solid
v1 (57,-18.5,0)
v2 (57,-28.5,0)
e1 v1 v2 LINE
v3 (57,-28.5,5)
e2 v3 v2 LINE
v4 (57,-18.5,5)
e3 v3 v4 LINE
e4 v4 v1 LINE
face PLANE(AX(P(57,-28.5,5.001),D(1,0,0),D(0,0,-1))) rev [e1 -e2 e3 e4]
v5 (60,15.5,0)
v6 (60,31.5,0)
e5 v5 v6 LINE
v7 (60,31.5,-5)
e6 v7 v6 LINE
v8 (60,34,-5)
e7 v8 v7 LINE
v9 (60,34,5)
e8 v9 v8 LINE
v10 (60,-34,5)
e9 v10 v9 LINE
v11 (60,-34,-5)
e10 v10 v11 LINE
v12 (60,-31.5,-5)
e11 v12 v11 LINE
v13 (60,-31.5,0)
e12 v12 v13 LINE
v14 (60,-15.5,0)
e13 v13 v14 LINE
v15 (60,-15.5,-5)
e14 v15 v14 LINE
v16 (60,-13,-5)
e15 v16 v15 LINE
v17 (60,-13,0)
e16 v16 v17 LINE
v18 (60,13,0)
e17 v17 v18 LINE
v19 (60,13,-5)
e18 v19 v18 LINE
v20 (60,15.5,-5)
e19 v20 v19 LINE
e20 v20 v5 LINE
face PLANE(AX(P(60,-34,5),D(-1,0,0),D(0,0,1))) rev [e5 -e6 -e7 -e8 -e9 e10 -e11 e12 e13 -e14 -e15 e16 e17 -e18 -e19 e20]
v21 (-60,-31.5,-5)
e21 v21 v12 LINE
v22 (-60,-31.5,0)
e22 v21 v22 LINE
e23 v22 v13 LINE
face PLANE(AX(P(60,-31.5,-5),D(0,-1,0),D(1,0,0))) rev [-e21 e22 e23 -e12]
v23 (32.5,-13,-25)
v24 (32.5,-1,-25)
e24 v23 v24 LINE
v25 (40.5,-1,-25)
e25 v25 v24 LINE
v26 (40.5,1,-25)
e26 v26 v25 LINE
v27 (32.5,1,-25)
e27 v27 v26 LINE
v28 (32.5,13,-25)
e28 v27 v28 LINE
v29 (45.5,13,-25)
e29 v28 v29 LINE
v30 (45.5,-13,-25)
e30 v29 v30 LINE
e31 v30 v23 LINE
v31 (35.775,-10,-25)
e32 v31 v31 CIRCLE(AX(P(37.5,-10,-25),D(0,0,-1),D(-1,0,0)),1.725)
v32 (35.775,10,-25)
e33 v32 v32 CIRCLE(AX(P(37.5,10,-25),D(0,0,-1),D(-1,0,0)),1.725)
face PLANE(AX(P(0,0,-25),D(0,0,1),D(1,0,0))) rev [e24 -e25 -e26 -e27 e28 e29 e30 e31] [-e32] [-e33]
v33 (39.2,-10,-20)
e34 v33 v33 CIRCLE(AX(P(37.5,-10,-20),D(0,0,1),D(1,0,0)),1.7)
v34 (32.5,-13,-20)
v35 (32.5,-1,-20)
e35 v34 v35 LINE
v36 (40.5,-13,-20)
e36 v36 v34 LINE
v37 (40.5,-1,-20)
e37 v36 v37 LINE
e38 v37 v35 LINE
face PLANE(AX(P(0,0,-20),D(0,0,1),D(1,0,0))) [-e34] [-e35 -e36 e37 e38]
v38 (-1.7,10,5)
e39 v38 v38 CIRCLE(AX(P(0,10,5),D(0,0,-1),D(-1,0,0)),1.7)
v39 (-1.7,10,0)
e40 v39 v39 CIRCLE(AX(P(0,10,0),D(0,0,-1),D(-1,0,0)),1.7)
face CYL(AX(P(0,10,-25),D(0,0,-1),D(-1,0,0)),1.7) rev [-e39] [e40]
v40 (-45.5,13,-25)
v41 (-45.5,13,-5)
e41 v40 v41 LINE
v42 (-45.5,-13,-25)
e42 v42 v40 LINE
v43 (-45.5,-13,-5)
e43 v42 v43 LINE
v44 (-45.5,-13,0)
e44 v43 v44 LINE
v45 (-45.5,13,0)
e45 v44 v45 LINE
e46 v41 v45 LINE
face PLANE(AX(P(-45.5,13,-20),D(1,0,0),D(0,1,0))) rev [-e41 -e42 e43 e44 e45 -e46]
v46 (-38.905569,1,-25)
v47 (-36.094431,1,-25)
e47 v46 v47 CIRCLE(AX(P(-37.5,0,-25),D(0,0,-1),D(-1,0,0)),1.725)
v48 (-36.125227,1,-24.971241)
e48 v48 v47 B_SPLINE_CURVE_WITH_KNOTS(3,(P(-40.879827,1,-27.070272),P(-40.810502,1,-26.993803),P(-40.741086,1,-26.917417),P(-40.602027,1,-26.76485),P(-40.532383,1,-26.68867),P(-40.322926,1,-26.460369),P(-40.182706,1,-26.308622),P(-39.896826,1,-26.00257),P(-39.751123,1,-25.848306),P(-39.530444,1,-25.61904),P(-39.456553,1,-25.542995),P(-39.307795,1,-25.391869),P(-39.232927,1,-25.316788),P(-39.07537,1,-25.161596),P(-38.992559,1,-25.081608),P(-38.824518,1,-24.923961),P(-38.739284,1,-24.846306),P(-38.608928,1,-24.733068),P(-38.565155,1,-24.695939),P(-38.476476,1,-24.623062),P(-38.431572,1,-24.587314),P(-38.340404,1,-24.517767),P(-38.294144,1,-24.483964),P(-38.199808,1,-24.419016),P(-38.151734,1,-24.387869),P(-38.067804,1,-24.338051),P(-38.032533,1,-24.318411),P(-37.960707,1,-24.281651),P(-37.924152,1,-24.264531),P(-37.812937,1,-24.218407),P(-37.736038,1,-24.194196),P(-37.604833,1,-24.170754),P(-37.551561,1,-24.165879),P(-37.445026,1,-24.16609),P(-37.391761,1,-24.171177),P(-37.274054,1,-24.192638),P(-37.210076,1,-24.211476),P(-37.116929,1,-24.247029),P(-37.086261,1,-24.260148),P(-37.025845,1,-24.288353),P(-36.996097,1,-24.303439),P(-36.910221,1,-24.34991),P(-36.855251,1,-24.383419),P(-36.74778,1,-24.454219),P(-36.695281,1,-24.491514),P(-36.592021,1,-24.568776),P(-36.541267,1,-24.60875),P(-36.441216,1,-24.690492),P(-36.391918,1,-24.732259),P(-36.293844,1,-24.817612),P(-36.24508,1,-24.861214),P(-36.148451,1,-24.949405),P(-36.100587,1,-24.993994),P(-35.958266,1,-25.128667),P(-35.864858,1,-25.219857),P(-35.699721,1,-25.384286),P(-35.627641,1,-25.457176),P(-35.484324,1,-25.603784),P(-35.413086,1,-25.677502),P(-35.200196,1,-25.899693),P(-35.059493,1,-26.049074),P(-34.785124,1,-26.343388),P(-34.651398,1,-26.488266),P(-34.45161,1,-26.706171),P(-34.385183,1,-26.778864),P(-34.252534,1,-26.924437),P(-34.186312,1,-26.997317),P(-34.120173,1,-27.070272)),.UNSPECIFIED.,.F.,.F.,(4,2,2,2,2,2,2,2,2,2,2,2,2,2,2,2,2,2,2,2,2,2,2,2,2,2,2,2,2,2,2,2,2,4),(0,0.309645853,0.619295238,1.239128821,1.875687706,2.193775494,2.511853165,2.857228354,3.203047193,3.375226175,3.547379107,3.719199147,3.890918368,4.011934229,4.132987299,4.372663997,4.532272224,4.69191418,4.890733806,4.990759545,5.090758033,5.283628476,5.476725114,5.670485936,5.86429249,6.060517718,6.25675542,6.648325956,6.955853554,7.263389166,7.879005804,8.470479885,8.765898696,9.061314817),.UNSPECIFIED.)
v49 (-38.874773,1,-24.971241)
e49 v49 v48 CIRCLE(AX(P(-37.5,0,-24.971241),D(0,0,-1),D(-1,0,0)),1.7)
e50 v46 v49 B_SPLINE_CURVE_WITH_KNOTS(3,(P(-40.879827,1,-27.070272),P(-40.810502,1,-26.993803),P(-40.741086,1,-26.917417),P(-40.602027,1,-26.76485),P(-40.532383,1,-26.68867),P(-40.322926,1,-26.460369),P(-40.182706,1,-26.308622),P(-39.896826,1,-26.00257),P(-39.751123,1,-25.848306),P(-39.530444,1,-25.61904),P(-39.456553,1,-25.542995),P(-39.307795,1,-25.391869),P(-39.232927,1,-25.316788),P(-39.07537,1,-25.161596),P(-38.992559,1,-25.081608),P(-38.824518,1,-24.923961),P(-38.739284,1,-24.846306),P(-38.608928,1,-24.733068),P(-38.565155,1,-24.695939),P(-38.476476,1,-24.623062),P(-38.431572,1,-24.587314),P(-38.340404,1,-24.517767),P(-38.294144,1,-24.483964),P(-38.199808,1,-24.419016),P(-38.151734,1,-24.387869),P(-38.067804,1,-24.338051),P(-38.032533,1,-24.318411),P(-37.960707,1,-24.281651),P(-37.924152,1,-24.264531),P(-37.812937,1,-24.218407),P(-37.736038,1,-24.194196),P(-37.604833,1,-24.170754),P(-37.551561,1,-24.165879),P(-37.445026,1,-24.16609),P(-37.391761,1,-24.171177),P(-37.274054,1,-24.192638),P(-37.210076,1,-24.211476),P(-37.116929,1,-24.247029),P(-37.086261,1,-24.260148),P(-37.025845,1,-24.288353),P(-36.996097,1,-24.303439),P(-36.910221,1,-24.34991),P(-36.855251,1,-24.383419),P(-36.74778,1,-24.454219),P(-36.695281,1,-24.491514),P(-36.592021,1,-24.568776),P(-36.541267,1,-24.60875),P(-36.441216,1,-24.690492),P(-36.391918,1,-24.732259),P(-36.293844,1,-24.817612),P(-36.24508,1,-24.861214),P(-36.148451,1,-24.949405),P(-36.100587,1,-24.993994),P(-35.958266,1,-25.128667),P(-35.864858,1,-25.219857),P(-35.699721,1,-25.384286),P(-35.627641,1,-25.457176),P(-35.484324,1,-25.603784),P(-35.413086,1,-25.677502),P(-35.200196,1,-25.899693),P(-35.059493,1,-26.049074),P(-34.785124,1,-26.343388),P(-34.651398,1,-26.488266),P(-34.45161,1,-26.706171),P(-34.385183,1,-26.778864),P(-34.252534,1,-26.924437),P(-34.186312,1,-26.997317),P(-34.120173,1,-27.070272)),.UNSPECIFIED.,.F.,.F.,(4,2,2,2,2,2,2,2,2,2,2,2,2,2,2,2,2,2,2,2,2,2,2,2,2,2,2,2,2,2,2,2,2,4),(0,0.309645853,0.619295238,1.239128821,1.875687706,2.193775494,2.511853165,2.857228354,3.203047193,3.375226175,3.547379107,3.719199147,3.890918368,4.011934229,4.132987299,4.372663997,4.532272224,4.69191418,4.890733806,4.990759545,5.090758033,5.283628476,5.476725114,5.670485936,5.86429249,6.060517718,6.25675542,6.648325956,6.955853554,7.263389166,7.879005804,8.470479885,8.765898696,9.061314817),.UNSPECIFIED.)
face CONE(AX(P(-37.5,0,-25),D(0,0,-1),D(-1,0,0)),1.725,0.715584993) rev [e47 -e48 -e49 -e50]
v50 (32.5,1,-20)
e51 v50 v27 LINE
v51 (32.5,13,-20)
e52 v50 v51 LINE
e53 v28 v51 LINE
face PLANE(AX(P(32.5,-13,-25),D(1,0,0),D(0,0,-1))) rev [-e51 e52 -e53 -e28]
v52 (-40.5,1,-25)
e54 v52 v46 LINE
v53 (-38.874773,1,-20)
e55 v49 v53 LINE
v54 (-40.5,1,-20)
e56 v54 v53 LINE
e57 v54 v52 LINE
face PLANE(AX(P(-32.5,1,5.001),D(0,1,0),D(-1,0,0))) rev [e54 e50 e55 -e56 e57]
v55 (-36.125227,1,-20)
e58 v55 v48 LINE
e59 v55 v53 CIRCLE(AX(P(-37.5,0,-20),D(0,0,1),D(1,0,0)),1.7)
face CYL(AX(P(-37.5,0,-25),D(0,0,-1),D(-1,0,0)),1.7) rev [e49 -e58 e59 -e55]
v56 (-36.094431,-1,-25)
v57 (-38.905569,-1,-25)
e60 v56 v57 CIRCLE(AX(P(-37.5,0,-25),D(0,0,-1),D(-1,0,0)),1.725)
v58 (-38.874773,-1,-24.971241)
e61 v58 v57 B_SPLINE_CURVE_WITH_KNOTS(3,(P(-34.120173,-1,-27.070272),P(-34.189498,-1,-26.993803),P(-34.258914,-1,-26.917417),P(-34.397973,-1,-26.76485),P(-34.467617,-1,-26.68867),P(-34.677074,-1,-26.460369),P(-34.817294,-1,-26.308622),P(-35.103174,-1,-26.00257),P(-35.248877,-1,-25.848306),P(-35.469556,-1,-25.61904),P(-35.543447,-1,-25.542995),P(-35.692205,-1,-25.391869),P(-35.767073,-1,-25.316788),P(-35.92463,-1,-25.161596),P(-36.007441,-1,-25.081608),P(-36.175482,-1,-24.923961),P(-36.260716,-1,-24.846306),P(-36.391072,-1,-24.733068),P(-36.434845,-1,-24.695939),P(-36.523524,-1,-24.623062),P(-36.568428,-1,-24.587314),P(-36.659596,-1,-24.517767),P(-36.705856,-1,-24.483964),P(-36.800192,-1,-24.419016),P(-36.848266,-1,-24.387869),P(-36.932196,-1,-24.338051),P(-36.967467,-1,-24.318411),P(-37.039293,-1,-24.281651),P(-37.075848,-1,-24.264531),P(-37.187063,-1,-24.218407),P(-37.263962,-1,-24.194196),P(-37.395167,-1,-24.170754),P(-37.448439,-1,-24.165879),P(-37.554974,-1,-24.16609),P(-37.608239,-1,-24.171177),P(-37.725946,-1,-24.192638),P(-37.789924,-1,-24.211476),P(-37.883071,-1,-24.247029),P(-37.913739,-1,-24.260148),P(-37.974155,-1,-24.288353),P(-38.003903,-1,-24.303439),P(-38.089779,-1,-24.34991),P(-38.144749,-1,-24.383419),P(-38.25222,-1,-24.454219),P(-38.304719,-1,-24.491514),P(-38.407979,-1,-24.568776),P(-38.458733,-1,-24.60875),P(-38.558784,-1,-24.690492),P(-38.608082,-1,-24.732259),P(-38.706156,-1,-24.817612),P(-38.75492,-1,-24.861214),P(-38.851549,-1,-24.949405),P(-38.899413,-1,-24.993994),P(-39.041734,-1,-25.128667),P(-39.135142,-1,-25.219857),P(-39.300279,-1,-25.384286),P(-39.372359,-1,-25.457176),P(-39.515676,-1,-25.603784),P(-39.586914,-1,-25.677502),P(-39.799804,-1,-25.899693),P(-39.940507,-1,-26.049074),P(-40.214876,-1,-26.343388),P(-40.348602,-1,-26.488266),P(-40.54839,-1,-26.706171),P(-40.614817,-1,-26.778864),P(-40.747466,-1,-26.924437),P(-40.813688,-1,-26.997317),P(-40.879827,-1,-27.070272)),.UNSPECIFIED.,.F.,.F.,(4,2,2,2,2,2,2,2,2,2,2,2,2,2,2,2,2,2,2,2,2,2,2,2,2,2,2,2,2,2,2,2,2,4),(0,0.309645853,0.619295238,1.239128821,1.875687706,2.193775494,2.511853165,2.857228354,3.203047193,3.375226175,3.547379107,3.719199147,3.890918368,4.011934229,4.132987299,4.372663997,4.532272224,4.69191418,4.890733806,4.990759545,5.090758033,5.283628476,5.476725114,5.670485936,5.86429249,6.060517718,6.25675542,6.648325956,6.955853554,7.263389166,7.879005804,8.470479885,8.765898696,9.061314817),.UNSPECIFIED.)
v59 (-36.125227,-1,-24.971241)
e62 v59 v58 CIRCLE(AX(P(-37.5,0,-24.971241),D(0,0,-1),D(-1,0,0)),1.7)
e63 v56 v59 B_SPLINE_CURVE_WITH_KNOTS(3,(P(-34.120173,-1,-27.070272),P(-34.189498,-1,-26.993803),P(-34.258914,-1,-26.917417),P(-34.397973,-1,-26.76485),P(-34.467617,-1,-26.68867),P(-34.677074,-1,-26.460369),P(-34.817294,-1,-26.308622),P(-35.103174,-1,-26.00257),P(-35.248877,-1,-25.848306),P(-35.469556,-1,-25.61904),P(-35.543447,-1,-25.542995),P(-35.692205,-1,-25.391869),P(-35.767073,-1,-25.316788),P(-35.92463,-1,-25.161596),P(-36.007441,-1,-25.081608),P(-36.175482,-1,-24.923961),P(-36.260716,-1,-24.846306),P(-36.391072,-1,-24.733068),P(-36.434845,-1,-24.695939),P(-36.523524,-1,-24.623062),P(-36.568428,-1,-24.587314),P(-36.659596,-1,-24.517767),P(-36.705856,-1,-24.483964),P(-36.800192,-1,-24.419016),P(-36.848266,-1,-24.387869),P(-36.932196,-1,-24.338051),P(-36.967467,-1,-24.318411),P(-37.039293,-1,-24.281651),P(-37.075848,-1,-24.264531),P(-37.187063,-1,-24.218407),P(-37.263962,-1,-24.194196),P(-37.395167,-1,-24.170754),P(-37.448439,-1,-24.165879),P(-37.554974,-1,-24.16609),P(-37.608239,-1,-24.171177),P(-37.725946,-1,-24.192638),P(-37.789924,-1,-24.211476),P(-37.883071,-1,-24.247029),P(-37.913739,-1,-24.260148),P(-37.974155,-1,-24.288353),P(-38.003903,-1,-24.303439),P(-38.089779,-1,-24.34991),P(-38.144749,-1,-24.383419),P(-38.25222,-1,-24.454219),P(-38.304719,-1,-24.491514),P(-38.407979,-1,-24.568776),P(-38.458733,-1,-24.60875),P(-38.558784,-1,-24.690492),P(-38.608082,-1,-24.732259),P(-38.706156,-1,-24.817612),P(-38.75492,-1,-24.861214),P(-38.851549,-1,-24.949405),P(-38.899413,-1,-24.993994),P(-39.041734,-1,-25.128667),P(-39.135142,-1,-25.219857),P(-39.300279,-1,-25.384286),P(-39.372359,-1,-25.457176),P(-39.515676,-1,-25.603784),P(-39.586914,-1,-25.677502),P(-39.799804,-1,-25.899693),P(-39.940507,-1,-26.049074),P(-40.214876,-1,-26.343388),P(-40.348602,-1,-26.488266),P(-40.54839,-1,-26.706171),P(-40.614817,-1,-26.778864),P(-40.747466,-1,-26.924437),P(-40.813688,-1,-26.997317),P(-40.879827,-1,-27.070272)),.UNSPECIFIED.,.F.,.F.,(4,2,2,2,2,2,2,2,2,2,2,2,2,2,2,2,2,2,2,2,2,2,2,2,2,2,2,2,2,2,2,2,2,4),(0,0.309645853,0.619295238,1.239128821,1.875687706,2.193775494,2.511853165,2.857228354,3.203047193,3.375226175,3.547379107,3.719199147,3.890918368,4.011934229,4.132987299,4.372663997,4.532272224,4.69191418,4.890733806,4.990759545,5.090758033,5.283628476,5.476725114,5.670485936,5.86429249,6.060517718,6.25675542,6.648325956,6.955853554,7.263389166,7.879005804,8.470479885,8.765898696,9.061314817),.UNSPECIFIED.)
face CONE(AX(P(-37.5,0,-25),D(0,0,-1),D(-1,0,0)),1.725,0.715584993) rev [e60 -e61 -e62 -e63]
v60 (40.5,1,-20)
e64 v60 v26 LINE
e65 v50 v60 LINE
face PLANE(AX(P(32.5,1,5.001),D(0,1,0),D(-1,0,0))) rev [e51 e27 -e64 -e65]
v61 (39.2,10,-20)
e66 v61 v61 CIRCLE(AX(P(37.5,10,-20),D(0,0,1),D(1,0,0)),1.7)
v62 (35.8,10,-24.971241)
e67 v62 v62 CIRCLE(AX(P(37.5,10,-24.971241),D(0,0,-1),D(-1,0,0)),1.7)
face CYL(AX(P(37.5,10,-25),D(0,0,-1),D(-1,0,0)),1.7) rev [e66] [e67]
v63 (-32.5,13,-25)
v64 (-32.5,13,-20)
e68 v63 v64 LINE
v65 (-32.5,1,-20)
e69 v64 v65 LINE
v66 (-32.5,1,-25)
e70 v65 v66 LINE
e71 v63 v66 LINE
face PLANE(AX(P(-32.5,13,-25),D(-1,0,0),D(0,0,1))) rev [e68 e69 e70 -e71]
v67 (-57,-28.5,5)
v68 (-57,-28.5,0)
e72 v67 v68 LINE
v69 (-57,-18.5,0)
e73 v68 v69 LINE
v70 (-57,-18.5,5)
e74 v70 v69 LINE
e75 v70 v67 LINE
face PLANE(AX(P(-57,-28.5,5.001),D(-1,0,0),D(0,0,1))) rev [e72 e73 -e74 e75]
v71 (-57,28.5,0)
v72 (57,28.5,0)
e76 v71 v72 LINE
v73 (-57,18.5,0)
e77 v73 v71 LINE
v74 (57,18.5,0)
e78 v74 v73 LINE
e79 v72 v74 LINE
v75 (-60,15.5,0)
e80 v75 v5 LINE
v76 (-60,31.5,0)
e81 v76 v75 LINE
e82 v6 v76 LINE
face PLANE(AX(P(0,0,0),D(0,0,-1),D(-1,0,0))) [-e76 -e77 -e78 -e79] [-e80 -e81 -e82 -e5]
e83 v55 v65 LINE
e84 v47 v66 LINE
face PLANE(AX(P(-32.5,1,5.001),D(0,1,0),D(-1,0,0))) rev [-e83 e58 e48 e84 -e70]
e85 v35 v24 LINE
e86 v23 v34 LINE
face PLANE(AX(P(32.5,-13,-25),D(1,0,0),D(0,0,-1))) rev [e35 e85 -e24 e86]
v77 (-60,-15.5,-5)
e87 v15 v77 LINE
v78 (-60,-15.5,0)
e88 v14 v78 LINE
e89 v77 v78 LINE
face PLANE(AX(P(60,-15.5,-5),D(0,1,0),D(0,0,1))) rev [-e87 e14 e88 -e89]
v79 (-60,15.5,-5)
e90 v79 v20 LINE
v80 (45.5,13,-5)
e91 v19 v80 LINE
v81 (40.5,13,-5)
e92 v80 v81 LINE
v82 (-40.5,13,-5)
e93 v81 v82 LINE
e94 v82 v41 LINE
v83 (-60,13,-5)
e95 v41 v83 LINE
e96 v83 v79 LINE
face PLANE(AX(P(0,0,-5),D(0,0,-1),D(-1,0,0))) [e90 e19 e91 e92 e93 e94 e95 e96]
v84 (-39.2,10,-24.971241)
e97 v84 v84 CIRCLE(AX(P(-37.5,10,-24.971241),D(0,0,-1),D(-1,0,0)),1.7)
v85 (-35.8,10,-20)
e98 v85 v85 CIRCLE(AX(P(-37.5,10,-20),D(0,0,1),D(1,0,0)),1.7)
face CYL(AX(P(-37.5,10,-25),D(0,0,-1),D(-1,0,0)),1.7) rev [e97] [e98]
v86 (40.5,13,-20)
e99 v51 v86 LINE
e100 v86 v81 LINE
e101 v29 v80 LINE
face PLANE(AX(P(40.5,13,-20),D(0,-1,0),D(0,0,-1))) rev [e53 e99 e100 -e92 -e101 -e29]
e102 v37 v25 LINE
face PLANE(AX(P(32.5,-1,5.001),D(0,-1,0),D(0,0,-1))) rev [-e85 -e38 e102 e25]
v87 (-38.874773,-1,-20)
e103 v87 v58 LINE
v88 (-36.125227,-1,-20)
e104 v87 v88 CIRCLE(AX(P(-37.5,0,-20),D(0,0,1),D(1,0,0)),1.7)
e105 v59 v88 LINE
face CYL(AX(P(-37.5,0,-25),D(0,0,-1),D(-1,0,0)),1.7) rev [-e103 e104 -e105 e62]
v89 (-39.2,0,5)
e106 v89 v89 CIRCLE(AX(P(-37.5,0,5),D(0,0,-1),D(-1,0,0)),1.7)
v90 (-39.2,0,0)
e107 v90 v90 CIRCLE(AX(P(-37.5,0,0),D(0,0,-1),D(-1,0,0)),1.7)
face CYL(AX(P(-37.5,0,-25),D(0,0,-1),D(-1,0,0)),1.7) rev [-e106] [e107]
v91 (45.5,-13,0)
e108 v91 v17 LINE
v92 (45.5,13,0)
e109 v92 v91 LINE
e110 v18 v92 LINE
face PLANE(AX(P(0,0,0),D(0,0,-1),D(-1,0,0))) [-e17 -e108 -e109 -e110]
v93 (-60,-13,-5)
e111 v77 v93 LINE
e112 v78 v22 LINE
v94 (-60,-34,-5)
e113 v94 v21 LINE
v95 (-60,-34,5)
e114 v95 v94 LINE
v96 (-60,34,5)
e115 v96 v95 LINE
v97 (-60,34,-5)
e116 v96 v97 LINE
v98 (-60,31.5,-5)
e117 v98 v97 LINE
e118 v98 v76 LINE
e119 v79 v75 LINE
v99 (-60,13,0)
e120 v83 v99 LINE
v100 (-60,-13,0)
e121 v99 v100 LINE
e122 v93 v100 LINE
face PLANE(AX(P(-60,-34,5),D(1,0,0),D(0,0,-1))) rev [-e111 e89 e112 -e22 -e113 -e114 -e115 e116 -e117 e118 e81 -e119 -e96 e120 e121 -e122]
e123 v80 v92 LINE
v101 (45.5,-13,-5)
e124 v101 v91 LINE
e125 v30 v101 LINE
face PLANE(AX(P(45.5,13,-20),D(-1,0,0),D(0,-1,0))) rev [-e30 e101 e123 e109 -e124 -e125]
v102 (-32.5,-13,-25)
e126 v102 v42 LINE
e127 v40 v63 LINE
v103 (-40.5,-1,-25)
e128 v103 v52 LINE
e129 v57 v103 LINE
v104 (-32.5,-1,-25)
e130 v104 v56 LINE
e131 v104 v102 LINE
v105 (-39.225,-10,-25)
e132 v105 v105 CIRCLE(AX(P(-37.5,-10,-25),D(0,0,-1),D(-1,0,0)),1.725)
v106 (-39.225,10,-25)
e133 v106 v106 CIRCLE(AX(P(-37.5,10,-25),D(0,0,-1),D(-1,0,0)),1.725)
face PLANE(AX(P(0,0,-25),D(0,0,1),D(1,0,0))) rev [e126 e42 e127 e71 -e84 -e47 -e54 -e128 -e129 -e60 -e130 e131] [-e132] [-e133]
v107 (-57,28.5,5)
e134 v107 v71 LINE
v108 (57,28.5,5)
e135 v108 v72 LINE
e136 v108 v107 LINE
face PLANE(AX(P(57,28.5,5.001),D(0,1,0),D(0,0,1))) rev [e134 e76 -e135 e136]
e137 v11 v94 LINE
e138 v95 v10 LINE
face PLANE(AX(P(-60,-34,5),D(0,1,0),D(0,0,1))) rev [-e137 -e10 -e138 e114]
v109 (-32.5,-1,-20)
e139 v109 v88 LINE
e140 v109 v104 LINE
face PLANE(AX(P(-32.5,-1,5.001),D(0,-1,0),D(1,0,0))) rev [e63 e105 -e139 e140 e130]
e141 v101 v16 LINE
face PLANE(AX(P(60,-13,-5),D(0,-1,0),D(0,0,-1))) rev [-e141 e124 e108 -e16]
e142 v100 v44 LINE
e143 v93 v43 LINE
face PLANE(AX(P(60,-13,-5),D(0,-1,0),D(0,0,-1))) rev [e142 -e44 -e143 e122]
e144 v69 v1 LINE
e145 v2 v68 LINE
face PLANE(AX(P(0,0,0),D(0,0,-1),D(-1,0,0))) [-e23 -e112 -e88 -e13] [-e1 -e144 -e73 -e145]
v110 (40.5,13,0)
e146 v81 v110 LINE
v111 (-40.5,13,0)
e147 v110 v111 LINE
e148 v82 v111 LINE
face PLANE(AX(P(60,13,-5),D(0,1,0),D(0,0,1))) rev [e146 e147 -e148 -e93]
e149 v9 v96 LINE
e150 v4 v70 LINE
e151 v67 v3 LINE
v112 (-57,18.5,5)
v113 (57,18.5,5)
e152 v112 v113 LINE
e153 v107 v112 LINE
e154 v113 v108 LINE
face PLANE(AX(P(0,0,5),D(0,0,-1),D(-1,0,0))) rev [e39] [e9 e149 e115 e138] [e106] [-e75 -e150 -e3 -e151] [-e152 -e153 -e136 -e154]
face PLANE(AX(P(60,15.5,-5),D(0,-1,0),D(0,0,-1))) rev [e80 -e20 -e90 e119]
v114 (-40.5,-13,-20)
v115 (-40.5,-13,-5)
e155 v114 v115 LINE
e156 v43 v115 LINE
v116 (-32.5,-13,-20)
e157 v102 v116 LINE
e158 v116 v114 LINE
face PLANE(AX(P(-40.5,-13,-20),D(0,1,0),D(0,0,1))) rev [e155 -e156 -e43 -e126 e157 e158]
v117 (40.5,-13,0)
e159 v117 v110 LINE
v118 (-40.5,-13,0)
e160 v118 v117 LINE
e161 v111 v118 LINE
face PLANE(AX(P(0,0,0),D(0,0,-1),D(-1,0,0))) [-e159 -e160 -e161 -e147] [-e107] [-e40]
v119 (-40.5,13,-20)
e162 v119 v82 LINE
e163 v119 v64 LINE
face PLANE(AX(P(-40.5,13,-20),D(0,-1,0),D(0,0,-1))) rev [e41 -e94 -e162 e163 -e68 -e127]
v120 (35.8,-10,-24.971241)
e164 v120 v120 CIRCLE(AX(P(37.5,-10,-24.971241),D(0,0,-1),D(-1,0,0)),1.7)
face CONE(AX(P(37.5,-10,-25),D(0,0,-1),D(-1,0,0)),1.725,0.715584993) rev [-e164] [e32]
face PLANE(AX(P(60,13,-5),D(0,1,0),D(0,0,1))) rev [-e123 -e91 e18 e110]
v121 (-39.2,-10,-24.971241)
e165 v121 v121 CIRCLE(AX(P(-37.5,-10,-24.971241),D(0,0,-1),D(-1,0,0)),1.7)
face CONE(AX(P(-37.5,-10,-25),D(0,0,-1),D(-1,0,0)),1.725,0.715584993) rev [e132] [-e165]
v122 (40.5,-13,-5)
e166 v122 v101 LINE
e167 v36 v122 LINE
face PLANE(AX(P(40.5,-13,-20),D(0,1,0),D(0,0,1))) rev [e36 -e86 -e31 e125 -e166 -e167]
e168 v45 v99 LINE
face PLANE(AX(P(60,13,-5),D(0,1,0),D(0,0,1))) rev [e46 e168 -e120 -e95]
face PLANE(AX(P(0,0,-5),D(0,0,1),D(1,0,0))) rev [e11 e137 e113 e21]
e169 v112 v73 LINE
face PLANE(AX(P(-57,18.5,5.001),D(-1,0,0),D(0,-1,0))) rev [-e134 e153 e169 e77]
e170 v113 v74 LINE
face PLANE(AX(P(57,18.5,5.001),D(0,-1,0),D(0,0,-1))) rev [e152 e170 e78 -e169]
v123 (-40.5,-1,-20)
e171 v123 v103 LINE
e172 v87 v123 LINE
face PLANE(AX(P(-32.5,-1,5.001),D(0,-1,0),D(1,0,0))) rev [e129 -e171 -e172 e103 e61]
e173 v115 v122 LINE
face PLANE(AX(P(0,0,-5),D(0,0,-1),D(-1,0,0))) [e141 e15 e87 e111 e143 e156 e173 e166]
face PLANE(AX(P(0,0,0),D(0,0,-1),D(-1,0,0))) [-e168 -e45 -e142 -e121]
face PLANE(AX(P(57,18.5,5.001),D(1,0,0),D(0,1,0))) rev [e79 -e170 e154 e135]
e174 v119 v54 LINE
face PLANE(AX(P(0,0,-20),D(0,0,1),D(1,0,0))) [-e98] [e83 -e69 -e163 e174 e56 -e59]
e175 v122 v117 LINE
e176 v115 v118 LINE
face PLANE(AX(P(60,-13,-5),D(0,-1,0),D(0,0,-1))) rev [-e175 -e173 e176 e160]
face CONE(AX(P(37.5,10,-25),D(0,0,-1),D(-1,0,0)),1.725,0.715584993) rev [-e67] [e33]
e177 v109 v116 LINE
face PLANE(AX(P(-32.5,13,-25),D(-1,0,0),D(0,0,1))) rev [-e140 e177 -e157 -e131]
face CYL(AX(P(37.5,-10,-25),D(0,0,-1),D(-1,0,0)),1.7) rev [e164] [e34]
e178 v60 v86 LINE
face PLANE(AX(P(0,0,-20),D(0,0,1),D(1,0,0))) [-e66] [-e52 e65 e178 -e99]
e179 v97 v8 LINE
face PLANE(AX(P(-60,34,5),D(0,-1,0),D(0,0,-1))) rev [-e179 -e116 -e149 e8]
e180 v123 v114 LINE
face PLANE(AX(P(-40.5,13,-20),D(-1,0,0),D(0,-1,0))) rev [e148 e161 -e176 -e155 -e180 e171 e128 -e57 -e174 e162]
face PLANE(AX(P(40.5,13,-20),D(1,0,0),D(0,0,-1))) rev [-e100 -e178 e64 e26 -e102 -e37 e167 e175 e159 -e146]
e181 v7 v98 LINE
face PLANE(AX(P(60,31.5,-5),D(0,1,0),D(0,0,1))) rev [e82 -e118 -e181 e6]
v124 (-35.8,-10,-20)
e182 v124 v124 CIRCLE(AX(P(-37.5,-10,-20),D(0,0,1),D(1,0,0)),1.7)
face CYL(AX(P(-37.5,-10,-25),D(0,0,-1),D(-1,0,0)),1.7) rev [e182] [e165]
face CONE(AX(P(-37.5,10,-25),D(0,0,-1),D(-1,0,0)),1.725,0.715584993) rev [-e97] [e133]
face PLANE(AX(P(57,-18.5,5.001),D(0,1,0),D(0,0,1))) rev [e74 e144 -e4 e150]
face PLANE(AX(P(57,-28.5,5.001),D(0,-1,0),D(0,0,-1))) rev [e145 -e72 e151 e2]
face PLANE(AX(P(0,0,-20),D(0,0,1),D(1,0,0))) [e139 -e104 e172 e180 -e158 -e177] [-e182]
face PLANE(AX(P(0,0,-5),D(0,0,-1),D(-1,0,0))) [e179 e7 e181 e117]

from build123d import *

# Parameters (mm, degrees)
SKETCH_1_W                 = 120
SKETCH_1_H                 = 68
EXTRUDE_1_DEPTH            = 5
SKETCH_2_W                 = 120
SKETCH_2_H                 = 2.5
EXTRUDE_2_DEPTH            = 5
CUT_EXTRUDE_1_REACH        = 71.145
SKETCH_3_W                 = 114
SKETCH_3_H                 = 10
SKETCH_4_W                 = 5
SKETCH_4_H                 = 26
EXTRUDE_3_DEPTH            = 20
SKETCH_5_W                 = 13
SKETCH_5_H                 = 26
EXTRUDE_4_DEPTH            = 5
CUT_EXTRUDE_2_REACH        = 77.206
SKETCH_6_W                 = 8
SKETCH_6_H                 = 2
HOLE_WIZARD_M3_1_OUTLINE_R = 1.7
HOLE_WIZARD_M3_1_DEPTH     = 5


# Read off the part's stored shape, not the designer's step: M3 すきま穴1
with BuildPart() as part:
    # ｽｹｯﾁ1 → ﾎﾞｽ - 押し出し1 (new body)
    with BuildSketch(Plane.XY):
        Rectangle(SKETCH_1_W, SKETCH_1_H)
    extrude(amount=EXTRUDE_1_DEPTH)

    # ｽｹｯﾁ2 → ﾎﾞｽ - 押し出し2 (add)
    with BuildSketch(Plane(origin=(0, 0, 0), x_dir=(-1, 0, 0), z_dir=(0, 0, -1))):
        with Locations((0, 32.75)):
            Rectangle(SKETCH_2_W, SKETCH_2_H)
        with Locations((0, 14.25)):
            Rectangle(SKETCH_2_W, SKETCH_2_H)
        with Locations((0, -14.25)):
            Rectangle(SKETCH_2_W, SKETCH_2_H)
        with Locations((0, -32.75)):
            Rectangle(SKETCH_2_W, SKETCH_2_H)
    extrude(amount=EXTRUDE_2_DEPTH)

    # ｽｹｯﾁ3 → ｶｯﾄ - 押し出し1 (cut, up to next)
    with BuildSketch(Plane(origin=(0, 0, 0), x_dir=(-1, 0, 0), z_dir=(0, 0, -1)), mode=Mode.PRIVATE) as cut_extrude_1_sk1:
        with Locations((0, 23.5)):
            Rectangle(SKETCH_3_W, SKETCH_3_H)
    cut_extrude_1_tool1 = extrude(cut_extrude_1_sk1.sketch, amount=-CUT_EXTRUDE_1_REACH, mode=Mode.PRIVATE) & part.part
    # ｽｹｯﾁ3 → ｶｯﾄ - 押し出し1 (cut, up to next)
    with BuildSketch(Plane(origin=(0, 0, 0), x_dir=(-1, 0, 0), z_dir=(0, 0, -1)), mode=Mode.PRIVATE) as cut_extrude_1_sk2:
        with Locations((0, -23.5)):
            Rectangle(SKETCH_3_W, SKETCH_3_H)
    cut_extrude_1_tool2 = extrude(cut_extrude_1_sk2.sketch, amount=-CUT_EXTRUDE_1_REACH, mode=Mode.PRIVATE) & part.part
    add(cut_extrude_1_tool1.solids().sort_by_distance((0, 23.5, 0))[0], mode=Mode.SUBTRACT)
    add(cut_extrude_1_tool2.solids().sort_by_distance((0, -23.5, 0))[0], mode=Mode.SUBTRACT)

    # ｽｹｯﾁ4 → ﾎﾞｽ - 押し出し3 (add)
    with BuildSketch(Plane(origin=(0, 0, 0), x_dir=(-1, 0, 0), z_dir=(0, 0, -1))):
        with Locations((-43, 0)):
            Rectangle(SKETCH_4_W, SKETCH_4_H)
        with Locations((43, 0)):
            Rectangle(SKETCH_4_W, SKETCH_4_H)
    extrude(amount=EXTRUDE_3_DEPTH)

    # ｽｹｯﾁ5 → ﾎﾞｽ - 押し出し4 (add)
    with BuildSketch(Plane(origin=(0, 0, -20), x_dir=(-1, 0, 0), z_dir=(0, 0, -1))):
        with Locations((-39, 0)):
            Rectangle(SKETCH_5_W, SKETCH_5_H)
        with Locations((39, 0)):
            Rectangle(SKETCH_5_W, SKETCH_5_H)
    extrude(amount=EXTRUDE_4_DEPTH)

    # ｽｹｯﾁ6 → ｶｯﾄ - 押し出し2 (cut, up to next)
    with BuildSketch(Plane(origin=(0, 0, -25), x_dir=(-1, 0, 0), z_dir=(0, 0, -1)), mode=Mode.PRIVATE) as cut_extrude_2_sk1:
        with Locations((-36.5, 0)):
            Rectangle(SKETCH_6_W, SKETCH_6_H)
    cut_extrude_2_tool1 = extrude(cut_extrude_2_sk1.sketch, amount=-CUT_EXTRUDE_2_REACH, mode=Mode.PRIVATE) & part.part
    # ｽｹｯﾁ6 → ｶｯﾄ - 押し出し2 (cut, up to next)
    with BuildSketch(Plane(origin=(0, 0, -25), x_dir=(-1, 0, 0), z_dir=(0, 0, -1)), mode=Mode.PRIVATE) as cut_extrude_2_sk2:
        with Locations((36.5, 0)):
            Rectangle(SKETCH_6_W, SKETCH_6_H)
    cut_extrude_2_tool2 = extrude(cut_extrude_2_sk2.sketch, amount=-CUT_EXTRUDE_2_REACH, mode=Mode.PRIVATE) & part.part
    add(cut_extrude_2_tool1.solids().sort_by_distance((36.5, 0, -25))[0], mode=Mode.SUBTRACT)
    add(cut_extrude_2_tool2.solids().sort_by_distance((-36.5, 0, -25))[0], mode=Mode.SUBTRACT)

    # M3 すきま穴1 outline → M3 すきま穴1 (cut)
    with BuildSketch(Plane.XY):
        with Locations((0, 10)):
            Circle(HOLE_WIZARD_M3_1_OUTLINE_R)
        with Locations((-37.5, 0)):
            Circle(HOLE_WIZARD_M3_1_OUTLINE_R)
    extrude(amount=HOLE_WIZARD_M3_1_DEPTH, mode=Mode.SUBTRACT)

    # Hole Wizard M3 _1 2 outline → Hole Wizard M3 _1 2 (revolve, cut)
    with BuildSketch(Plane(origin=(-37.5, 0, 0), x_dir=(1, 0, 0), z_dir=(0, -1, 0))):
        Polygon((1.7, -24.97124079), (1.7, -20), (0, -20), (0, -25.000000133), (1.725000116, -25.000000133), align=None)
    revolve(axis=Axis((-37.5, 0, 0), (0, 0, 1)), mode=Mode.SUBTRACT)

    # Hole Wizard M3 _1 3 outline → Hole Wizard M3 _1 3 (revolve, cut)
    with BuildSketch(Plane(origin=(-37.5, 10, 0), x_dir=(1, 0, 0), z_dir=(0, -1, 0))):
        Polygon((1.7, -24.97124079), (1.7, -20), (0, -20), (0, -25), (1.725, -25), align=None)
    revolve(axis=Axis((-37.5, 10, 0), (0, 0, 1)), mode=Mode.SUBTRACT)

    # Hole Wizard M3 _1 4 outline → Hole Wizard M3 _1 4 (revolve, cut)
    with BuildSketch(Plane(origin=(37.5, -10, 0), x_dir=(1, 0, 0), z_dir=(0, -1, 0))):
        Polygon((1.7, -24.97124079), (1.7, -20), (0, -20), (0, -25), (1.725, -25), align=None)
    revolve(axis=Axis((37.5, -10, 0), (0, 0, 1)), mode=Mode.SUBTRACT)

    # Hole Wizard M3 _1 5 outline → Hole Wizard M3 _1 5 (revolve, cut)
    with BuildSketch(Plane(origin=(-37.5, -10, 0), x_dir=(1, 0, 0), z_dir=(0, -1, 0))):
        Polygon((1.7, -24.97124079), (1.7, -20), (0, -20), (0, -25), (1.725, -25), align=None)
    revolve(axis=Axis((-37.5, -10, 0), (0, 0, 1)), mode=Mode.SUBTRACT)

    # Hole Wizard M3 _1 6 outline → Hole Wizard M3 _1 6 (revolve, cut)
    with BuildSketch(Plane(origin=(37.5, 10, 0), x_dir=(1, 0, 0), z_dir=(0, -1, 0))):
        Polygon((1.7, -24.97124079), (1.7, -20), (0, -20), (0, -25), (1.725, -25), align=None)
    revolve(axis=Axis((37.5, 10, 0), (0, 0, 1)), mode=Mode.SUBTRACT)


solid = part.part
